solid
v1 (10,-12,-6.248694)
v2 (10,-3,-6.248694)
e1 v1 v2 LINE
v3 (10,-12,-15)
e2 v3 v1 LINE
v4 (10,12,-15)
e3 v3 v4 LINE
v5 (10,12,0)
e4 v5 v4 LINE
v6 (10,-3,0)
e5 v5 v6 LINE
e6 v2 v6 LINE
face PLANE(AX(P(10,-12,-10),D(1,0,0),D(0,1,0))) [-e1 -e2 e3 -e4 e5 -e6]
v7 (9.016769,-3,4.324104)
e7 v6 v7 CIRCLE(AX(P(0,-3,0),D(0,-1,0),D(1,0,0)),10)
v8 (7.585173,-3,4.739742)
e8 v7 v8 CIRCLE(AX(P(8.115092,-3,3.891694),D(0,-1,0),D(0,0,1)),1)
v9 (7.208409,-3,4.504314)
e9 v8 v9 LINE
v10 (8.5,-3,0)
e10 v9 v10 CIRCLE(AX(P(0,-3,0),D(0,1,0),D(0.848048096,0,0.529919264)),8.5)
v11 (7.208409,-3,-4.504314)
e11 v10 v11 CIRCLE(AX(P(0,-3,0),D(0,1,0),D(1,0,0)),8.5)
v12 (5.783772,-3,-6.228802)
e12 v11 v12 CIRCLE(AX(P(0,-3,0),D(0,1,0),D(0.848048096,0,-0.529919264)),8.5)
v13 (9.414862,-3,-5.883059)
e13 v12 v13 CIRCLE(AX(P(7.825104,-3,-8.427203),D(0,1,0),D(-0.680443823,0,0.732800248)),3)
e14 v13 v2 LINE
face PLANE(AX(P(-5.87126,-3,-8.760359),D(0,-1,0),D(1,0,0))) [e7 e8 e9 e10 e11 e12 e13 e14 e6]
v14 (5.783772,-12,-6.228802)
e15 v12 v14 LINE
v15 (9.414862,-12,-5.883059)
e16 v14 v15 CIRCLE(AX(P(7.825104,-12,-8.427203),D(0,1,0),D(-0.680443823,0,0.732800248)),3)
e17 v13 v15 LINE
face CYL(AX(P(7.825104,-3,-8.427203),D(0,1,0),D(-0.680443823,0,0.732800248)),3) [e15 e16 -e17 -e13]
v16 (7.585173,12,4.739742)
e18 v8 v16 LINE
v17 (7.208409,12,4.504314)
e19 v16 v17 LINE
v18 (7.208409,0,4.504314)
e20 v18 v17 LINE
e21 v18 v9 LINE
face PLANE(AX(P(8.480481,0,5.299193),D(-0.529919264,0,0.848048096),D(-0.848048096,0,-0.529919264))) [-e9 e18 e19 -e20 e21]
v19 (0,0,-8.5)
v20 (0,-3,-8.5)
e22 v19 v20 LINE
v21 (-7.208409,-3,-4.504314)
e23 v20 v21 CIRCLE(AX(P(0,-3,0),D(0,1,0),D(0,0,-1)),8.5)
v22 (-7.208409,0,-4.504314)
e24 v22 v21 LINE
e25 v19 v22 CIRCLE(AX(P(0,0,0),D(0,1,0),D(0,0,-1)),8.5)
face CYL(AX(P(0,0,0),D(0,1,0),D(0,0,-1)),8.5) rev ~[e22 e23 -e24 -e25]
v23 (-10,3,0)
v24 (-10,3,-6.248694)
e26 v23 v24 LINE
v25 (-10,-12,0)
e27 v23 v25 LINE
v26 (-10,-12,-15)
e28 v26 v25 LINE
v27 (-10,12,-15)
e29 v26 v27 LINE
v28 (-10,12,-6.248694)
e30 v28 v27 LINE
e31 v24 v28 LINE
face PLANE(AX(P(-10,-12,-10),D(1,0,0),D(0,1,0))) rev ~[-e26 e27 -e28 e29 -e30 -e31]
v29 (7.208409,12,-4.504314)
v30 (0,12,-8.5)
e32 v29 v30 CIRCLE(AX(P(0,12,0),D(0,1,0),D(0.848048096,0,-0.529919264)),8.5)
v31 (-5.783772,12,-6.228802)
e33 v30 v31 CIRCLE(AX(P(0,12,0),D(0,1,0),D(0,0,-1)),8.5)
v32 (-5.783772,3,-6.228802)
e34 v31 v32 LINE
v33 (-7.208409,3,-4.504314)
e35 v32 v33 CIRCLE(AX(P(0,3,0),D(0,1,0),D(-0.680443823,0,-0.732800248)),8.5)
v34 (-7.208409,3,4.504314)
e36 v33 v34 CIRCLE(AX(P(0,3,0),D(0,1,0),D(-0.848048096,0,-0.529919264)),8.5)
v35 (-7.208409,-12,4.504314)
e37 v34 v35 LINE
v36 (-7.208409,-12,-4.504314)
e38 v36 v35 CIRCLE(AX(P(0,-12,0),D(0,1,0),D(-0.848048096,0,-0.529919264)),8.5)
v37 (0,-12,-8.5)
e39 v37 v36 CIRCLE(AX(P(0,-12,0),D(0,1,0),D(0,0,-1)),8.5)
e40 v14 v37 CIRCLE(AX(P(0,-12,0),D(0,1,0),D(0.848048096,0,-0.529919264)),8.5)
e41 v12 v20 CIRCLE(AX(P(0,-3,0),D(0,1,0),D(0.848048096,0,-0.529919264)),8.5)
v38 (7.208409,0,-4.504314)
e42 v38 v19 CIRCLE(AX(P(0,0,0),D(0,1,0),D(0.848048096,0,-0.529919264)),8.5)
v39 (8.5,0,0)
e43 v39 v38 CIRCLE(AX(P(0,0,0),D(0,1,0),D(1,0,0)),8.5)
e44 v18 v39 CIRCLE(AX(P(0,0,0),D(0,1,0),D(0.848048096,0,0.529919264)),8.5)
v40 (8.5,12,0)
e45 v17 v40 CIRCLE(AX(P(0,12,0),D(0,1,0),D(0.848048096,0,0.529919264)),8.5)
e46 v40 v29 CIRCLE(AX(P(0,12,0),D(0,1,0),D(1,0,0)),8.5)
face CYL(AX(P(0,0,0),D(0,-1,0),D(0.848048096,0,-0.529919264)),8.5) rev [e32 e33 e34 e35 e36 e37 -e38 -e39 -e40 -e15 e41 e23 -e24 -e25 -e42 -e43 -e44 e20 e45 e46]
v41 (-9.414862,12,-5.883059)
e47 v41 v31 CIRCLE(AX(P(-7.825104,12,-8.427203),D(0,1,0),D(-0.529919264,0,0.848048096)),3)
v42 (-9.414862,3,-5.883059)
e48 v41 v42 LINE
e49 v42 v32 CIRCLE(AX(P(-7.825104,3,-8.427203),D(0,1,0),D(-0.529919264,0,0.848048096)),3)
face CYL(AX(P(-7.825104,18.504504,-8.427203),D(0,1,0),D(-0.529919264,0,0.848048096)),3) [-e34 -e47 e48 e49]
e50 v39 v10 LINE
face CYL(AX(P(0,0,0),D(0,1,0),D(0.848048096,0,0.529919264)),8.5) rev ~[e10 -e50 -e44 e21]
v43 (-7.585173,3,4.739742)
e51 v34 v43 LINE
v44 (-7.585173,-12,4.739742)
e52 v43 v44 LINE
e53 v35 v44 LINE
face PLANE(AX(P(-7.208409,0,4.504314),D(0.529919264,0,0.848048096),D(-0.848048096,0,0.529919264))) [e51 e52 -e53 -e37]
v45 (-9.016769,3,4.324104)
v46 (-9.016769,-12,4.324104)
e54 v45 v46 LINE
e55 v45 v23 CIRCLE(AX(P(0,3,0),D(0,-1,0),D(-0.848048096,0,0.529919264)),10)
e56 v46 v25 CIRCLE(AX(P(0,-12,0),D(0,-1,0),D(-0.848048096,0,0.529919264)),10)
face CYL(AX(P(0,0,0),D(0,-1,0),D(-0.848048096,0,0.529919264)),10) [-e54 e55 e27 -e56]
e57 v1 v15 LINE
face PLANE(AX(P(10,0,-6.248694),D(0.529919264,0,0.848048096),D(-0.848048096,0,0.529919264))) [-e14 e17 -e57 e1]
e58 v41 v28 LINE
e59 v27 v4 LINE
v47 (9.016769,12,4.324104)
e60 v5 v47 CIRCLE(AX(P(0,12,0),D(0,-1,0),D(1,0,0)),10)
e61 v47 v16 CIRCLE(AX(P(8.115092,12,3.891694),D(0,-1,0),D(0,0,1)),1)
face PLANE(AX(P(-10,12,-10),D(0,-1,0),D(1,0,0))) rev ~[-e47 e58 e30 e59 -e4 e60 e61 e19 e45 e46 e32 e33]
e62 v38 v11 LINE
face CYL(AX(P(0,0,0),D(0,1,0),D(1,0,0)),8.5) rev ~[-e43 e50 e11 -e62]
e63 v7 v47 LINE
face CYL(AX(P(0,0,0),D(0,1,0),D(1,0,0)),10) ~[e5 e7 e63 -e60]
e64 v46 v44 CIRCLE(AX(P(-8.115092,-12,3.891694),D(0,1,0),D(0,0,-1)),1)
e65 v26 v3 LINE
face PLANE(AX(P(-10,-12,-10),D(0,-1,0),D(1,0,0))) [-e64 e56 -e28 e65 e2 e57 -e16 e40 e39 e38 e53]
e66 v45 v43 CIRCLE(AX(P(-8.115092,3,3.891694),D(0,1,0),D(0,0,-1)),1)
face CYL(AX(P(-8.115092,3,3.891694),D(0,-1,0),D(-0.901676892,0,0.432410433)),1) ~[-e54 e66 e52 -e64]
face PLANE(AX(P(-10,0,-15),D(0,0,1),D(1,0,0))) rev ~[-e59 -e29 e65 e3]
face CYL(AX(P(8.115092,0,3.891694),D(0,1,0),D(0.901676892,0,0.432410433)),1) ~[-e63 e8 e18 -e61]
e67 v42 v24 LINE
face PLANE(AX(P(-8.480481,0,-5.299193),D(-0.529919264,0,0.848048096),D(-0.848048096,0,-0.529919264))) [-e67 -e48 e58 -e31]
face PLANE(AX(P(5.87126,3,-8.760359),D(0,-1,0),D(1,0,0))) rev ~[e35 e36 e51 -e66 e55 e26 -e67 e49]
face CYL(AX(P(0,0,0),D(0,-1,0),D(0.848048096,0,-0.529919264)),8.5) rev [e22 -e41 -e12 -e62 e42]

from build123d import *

# Parameters (mm, degrees)
F1_DEPTH      = 12
F1_DEPTH_BACK = 3
F2_DEPTH      = 12
F2_DEPTH_BACK = 3
F3_T1_DEPTH   = 15.504504139
F3_T3_DEPTH   = 15.504504139
F4_R          = 1
F5_DEPTH      = 5


# Not quite as in the source:
# - a fillet or chamfer that OpenCascade refuses, or shapes differently, is made with other operations: its cross-section is extruded or revolved along the edge and cut away or added


with BuildPart() as f1:
    # F0 (on Front) → F1 (new body, two sides)
    with BuildSketch(Plane.XZ) as f1_sk:
        with BuildLine():
            Line((10, -6.2486935191), (8.4804809616, -5.2991926423))
            ThreePointArc((8.4804809616, -5.2991926423), (4.8480962025, -8.7461970714), (0, -10))
            Line((0, -10), (10, -10))
            Line((10, -10), (10, -6.2486935191))
        make_face()
        with BuildLine():
            Line((-10, -10), (0, -10))
            ThreePointArc((0, -10), (-4.8480962025, -8.7461970714), (-8.4804809616, -5.2991926423))
            Line((-8.4804809616, -5.2991926423), (-10, -6.2486935191))
            Line((-10, -6.2486935191), (-10, -10))
        make_face()
        with BuildLine():
            Line((8.4804809616, -5.2991926423), (7.2084088173, -4.504313746))
            ThreePointArc((7.2084088173, -4.504313746), (4.1208817721, -7.4342675107), (0, -8.5))
            Line((0, -8.5), (0, -10))
            ThreePointArc((0, -10), (4.8480962025, -8.7461970714), (8.4804809616, -5.2991926423))
        make_face()
        with BuildLine():
            Line((0, -10), (0, -8.5))
            ThreePointArc((0, -8.5), (-4.1208817721, -7.4342675107), (-7.2084088173, -4.504313746))
            Line((-7.2084088173, -4.504313746), (-8.4804809616, -5.2991926423))
            ThreePointArc((-8.4804809616, -5.2991926423), (-4.8480962025, -8.7461970714), (0, -10))
        make_face()
        with BuildLine():
            ThreePointArc((-7.2084088173, -4.504313746), (-8.5, 0), (-7.2084088173, 4.504313746))
            Line((-7.2084088173, 4.504313746), (-8.4804809616, 5.2991926423))
            ThreePointArc((-8.4804809616, 5.2991926423), (-9.6126169594, 2.7563735582), (-10, 0))
            ThreePointArc((-10, 0), (-9.6126169594, -2.7563735582), (-8.4804809616, -5.2991926423))
            Line((-8.4804809616, -5.2991926423), (-7.2084088173, -4.504313746))
        make_face()
        with BuildLine():
            Line((-10, -6.2486935191), (-8.4804809616, -5.2991926423))
            ThreePointArc((-8.4804809616, -5.2991926423), (-9.6126169594, -2.7563735582), (-10, 0))
            Line((-10, 0), (-10, -6.2486935191))
        make_face()
    extrude(amount=F1_DEPTH)
    extrude(f1_sk.sketch, amount=-F1_DEPTH_BACK)

    # F0 (on Front) → F2 (join, two sides)
    with BuildSketch(Plane.XZ) as f2_sk:
        with BuildLine():
            Line((-10, -10), (0, -10))
            ThreePointArc((0, -10), (-4.8480962025, -8.7461970714), (-8.4804809616, -5.2991926423))
            Line((-8.4804809616, -5.2991926423), (-10, -6.2486935191))
            Line((-10, -6.2486935191), (-10, -10))
        make_face()
        with BuildLine():
            Line((8.4804809616, -5.2991926423), (7.2084088173, -4.504313746))
            ThreePointArc((7.2084088173, -4.504313746), (4.1208817721, -7.4342675107), (0, -8.5))
            Line((0, -8.5), (0, -10))
            ThreePointArc((0, -10), (4.8480962025, -8.7461970714), (8.4804809616, -5.2991926423))
        make_face()
        with BuildLine():
            Line((0, -10), (0, -8.5))
            ThreePointArc((0, -8.5), (-4.1208817721, -7.4342675107), (-7.2084088173, -4.504313746))
            Line((-7.2084088173, -4.504313746), (-8.4804809616, -5.2991926423))
            ThreePointArc((-8.4804809616, -5.2991926423), (-4.8480962025, -8.7461970714), (0, -10))
        make_face()
        with BuildLine():
            Line((10, -6.2486935191), (8.4804809616, -5.2991926423))
            ThreePointArc((8.4804809616, -5.2991926423), (4.8480962025, -8.7461970714), (0, -10))
            Line((0, -10), (10, -10))
            Line((10, -10), (10, -6.2486935191))
        make_face()
        with BuildLine():
            ThreePointArc((7.2084088173, 4.504313746), (8.1707244155, 2.3429175244), (8.5, 0))
            ThreePointArc((8.5, 0), (8.1707244155, -2.3429175244), (7.2084088173, -4.504313746))
            Line((7.2084088173, -4.504313746), (8.4804809616, -5.2991926423))
            ThreePointArc((8.4804809616, -5.2991926423), (9.6126169594, -2.7563735582), (10, 0))
            ThreePointArc((10, 0), (9.6126169594, 2.7563735582), (8.4804809616, 5.2991926423))
            Line((8.4804809616, 5.2991926423), (7.2084088173, 4.504313746))
        make_face()
        with BuildLine():
            ThreePointArc((10, 0), (9.6126169594, -2.7563735582), (8.4804809616, -5.2991926423))
            Line((8.4804809616, -5.2991926423), (10, -6.2486935191))
            Line((10, -6.2486935191), (10, 0))
        make_face()
    extrude(amount=-F2_DEPTH)
    extrude(f2_sk.sketch, amount=F2_DEPTH_BACK)

    # F3: fillet of radius 3 on 2 edges, made by hand

    # F3_s2 → F3_t1 (cut)
    with BuildSketch(Plane.XZ.offset(-18.504504139)):
        with BuildLine():
            ThreePointArc((-9.4148617579, -5.883058565), (-7.5407373956, -5.4407106546), (-5.783772496, -6.2288021091))
            ThreePointArc((-5.783772496, -6.2288021091), (-6.5530648439, -5.413625509), (-7.2084088173, -4.504313746))
            Line((-7.2084088173, -4.504313746), (-9.4148617579, -5.883058565))
        make_face()
    extrude(amount=F3_T1_DEPTH, mode=Mode.SUBTRACT)

    # F3_s4 → F3_t3 (cut)
    with BuildSketch(Plane.XZ.offset(3)):
        with BuildLine():
            ThreePointArc((5.783772496, -6.2288021091), (7.5407373956, -5.4407106546), (9.4148617579, -5.883058565))
            Line((9.4148617579, -5.883058565), (7.2084088173, -4.504313746))
            ThreePointArc((7.2084088173, -4.504313746), (6.5530648439, -5.413625509), (5.783772496, -6.2288021091))
        make_face()
    extrude(amount=F3_T3_DEPTH, mode=Mode.SUBTRACT)

    # F4
    f4_edges = [f1.edges().sort_by_distance(p)[0] for p in [
        (8.480481, 4.5, 5.299193),
        (-8.480481, -4.5, 5.299193),
    ]]
    fillet(f4_edges, radius=F4_R)

    # F5 (add): a face of the model
    f5_faces = [f1.faces().sort_by_distance(p)[0] for p in [
        (0, 0, -10),
    ]]
    extrude(f5_faces, amount=F5_DEPTH)


solid = f1.part
